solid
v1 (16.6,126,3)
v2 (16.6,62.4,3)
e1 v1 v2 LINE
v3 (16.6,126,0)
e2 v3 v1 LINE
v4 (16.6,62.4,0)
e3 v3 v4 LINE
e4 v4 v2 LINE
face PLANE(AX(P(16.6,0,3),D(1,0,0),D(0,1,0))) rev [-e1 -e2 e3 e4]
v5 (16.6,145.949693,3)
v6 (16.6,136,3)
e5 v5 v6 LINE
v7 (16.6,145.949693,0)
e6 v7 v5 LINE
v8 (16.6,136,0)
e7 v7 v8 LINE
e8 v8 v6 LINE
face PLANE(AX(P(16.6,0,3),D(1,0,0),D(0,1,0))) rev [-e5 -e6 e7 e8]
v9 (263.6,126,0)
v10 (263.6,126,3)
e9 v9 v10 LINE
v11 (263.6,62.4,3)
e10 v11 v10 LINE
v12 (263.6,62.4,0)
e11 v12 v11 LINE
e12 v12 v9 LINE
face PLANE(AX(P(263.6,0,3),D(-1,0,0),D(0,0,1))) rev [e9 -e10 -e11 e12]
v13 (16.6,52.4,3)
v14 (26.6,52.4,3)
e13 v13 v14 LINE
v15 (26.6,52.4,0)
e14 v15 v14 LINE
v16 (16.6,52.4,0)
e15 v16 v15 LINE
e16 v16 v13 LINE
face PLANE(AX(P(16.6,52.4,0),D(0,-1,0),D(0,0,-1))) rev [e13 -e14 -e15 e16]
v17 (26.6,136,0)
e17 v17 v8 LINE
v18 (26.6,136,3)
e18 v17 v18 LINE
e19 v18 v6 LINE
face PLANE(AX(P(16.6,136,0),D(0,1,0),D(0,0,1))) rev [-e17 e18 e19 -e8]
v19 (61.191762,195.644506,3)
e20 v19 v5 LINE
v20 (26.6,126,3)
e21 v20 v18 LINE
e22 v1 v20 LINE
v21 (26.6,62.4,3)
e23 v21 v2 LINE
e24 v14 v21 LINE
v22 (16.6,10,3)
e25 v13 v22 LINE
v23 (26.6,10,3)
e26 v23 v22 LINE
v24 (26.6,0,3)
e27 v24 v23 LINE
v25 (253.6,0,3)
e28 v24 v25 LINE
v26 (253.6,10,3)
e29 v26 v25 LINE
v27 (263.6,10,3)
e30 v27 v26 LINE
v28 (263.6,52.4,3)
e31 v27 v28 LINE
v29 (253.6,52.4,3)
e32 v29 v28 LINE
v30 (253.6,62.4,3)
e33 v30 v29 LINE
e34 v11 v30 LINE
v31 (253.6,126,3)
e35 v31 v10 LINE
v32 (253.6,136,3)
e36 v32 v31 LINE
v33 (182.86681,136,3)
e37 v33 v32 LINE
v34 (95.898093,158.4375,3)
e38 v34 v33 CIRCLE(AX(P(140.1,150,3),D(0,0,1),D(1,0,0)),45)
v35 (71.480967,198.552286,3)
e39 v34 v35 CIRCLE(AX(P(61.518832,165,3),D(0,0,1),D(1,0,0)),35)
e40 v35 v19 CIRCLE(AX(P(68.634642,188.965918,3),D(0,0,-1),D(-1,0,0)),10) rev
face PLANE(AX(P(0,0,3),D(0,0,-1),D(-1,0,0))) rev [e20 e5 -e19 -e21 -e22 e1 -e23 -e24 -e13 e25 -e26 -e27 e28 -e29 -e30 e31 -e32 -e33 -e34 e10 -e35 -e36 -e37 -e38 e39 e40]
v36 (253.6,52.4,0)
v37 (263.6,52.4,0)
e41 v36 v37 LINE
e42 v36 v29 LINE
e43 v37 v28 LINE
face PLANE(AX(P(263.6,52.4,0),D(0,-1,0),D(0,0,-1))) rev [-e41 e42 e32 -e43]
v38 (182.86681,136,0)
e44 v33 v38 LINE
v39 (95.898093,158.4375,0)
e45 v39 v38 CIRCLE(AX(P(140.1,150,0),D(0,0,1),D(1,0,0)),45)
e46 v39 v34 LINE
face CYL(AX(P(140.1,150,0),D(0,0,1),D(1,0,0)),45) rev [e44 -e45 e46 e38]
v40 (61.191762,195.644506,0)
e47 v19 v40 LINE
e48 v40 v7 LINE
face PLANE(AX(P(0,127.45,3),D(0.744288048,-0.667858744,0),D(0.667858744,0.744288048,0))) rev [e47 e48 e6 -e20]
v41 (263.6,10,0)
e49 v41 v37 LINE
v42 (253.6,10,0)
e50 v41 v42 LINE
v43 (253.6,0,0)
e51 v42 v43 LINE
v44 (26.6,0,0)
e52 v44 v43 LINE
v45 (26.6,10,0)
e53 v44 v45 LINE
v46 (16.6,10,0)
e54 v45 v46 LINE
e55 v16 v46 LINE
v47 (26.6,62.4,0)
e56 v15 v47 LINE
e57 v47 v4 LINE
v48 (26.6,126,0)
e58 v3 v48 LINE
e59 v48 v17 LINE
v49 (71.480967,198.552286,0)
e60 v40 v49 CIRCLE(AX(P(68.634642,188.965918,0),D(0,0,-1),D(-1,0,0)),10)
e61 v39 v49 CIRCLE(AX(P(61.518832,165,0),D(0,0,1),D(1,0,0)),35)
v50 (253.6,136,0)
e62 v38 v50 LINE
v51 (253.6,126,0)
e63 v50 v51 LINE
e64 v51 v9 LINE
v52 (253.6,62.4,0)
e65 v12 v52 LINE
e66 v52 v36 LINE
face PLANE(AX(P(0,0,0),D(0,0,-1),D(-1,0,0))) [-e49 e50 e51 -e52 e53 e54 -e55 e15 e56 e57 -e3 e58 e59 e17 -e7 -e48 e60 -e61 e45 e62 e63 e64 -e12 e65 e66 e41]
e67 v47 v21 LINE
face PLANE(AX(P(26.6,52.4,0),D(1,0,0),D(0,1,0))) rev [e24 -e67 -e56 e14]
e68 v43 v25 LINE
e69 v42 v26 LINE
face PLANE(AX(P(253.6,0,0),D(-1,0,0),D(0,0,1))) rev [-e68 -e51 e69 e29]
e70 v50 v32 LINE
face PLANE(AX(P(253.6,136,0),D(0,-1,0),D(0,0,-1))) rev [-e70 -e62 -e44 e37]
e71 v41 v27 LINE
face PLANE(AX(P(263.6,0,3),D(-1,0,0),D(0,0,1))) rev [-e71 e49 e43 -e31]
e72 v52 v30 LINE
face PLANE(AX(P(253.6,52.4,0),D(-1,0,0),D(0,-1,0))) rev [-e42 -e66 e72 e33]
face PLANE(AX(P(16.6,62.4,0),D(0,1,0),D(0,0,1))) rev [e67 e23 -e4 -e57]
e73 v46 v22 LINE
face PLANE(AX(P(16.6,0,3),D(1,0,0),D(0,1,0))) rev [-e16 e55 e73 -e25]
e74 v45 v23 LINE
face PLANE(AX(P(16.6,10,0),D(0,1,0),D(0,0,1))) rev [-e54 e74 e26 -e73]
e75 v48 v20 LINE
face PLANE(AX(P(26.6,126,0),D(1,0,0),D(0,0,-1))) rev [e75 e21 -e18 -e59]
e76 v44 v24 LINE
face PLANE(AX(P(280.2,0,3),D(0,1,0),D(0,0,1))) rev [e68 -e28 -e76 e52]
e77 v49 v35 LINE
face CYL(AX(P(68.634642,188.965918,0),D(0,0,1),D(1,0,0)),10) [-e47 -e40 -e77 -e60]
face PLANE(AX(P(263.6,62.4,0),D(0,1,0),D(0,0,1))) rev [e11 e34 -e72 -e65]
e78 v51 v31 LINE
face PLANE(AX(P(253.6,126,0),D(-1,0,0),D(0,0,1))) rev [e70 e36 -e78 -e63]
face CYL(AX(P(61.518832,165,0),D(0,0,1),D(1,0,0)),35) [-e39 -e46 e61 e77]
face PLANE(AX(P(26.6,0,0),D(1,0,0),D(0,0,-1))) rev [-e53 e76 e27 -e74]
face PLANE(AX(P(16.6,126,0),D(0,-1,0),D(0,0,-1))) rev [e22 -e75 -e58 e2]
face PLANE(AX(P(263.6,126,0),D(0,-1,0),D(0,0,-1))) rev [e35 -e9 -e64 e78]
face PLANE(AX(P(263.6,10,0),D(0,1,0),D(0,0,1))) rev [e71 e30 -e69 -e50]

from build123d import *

# Parameters (mm, degrees)
BOSS_EXTRU_1_DEPTH      = 3
ENL_V_MAT_EXTRU_1_DEPTH = 345.268848431
ESQUISSE4_W             = 10
ESQUISSE4_H             = 10
ENL_V_MAT_EXTRU_2_DEPTH = 331.898715622
ENL_V_MAT_EXTRU_3_DEPTH = 331.898715622
CONG_2_R                = 10
ENL_V_MAT_EXTRU_4_DEPTH = 331.274729043


with BuildPart() as part:
    # Esquisse1 → Boss.-Extru.1 (new body)
    with BuildSketch(Plane.XY):
        Polygon((0, 0), (0, 127.45), (65.1, 200), (215.1, 200), (280.2, 127.45), (280.2, 0), align=None)
    extrude(amount=BOSS_EXTRU_1_DEPTH)

    # Esquisse2 → Enlèv. mat.-Extru.1 (cut, through all)
    with BuildSketch(Plane(origin=(0, 0, 0), x_dir=(-1, 0, 0), z_dir=(0, 0, -1))):
        Polygon((-16.6, 0), (-16.6, 145.969439351), (0, 127.45), (0, 0), align=None)
        Polygon((-280.2, 127.45), (-263.6, 145.969439351), (-263.6, 0), (-280.2, 0), align=None)
    extrude(amount=-ENL_V_MAT_EXTRU_1_DEPTH, mode=Mode.SUBTRACT)

    # Esquisse4 → Enlèv. mat.-Extru.2 (cut, through all)
    with BuildSketch(Plane.XY.offset(3)):
        with Locations((21.6, 5)):
            Rectangle(ESQUISSE4_W, ESQUISSE4_H)
        with Locations((21.6, 57.4)):
            Rectangle(ESQUISSE4_W, ESQUISSE4_H)
        with Locations((258.6, 131)):
            Rectangle(ESQUISSE4_W, ESQUISSE4_H)
        with Locations((21.6, 131)):
            Rectangle(ESQUISSE4_W, ESQUISSE4_H)
        with Locations((258.6, 57.4)):
            Rectangle(ESQUISSE4_W, ESQUISSE4_H)
        with Locations((258.6, 5)):
            Rectangle(ESQUISSE4_W, ESQUISSE4_H)
    extrude(amount=-ENL_V_MAT_EXTRU_2_DEPTH, mode=Mode.SUBTRACT)

    # Esquisse5 → Enlèv. mat.-Extru.3 (cut, through all)
    with BuildSketch(Plane.XY.offset(3)):
        with BuildLine():
            ThreePointArc((184.301907128, 158.4375), (191.711856965, 187.308210372), (218.681168228, 200))
            Line((218.681168228, 200), (215.1, 200))
            Line((215.1, 200), (140.1, 200))
            Line((140.1, 200), (65.1, 200))
            Line((65.1, 200), (61.518831772, 200))
            ThreePointArc((61.518831772, 200), (88.488143035, 187.308210372), (95.898092872, 158.4375))
            ThreePointArc((95.898092872, 158.4375), (140.1, 105), (184.301907128, 158.4375))
        make_face()
    extrude(amount=-ENL_V_MAT_EXTRU_3_DEPTH, mode=Mode.SUBTRACT)

    # Congé2
    cong_2_edges = [part.edges().sort_by_distance(p)[0] for p in [
        (64.94882545, 199.831525137, 1.5),
        (215.25117455, 199.831525137, 1.5),
    ]]
    fillet(cong_2_edges, radius=CONG_2_R)

    # Esquisse6 → Enlèv. mat.-Extru.4 (cut, through all)
    with BuildSketch(Plane.XY.offset(3)):
        Polygon((253.6, 136), (162.037145506, 136), (157.83002171, 194.744262237), (193.590573974, 207.065124781), (241.070971096, 207.065124781), (283.142209053, 167.698466408), (280.738138313, 136), (273.47498576, 135.479830357), align=None)
    extrude(amount=-ENL_V_MAT_EXTRU_4_DEPTH, mode=Mode.SUBTRACT)


solid = part.part
